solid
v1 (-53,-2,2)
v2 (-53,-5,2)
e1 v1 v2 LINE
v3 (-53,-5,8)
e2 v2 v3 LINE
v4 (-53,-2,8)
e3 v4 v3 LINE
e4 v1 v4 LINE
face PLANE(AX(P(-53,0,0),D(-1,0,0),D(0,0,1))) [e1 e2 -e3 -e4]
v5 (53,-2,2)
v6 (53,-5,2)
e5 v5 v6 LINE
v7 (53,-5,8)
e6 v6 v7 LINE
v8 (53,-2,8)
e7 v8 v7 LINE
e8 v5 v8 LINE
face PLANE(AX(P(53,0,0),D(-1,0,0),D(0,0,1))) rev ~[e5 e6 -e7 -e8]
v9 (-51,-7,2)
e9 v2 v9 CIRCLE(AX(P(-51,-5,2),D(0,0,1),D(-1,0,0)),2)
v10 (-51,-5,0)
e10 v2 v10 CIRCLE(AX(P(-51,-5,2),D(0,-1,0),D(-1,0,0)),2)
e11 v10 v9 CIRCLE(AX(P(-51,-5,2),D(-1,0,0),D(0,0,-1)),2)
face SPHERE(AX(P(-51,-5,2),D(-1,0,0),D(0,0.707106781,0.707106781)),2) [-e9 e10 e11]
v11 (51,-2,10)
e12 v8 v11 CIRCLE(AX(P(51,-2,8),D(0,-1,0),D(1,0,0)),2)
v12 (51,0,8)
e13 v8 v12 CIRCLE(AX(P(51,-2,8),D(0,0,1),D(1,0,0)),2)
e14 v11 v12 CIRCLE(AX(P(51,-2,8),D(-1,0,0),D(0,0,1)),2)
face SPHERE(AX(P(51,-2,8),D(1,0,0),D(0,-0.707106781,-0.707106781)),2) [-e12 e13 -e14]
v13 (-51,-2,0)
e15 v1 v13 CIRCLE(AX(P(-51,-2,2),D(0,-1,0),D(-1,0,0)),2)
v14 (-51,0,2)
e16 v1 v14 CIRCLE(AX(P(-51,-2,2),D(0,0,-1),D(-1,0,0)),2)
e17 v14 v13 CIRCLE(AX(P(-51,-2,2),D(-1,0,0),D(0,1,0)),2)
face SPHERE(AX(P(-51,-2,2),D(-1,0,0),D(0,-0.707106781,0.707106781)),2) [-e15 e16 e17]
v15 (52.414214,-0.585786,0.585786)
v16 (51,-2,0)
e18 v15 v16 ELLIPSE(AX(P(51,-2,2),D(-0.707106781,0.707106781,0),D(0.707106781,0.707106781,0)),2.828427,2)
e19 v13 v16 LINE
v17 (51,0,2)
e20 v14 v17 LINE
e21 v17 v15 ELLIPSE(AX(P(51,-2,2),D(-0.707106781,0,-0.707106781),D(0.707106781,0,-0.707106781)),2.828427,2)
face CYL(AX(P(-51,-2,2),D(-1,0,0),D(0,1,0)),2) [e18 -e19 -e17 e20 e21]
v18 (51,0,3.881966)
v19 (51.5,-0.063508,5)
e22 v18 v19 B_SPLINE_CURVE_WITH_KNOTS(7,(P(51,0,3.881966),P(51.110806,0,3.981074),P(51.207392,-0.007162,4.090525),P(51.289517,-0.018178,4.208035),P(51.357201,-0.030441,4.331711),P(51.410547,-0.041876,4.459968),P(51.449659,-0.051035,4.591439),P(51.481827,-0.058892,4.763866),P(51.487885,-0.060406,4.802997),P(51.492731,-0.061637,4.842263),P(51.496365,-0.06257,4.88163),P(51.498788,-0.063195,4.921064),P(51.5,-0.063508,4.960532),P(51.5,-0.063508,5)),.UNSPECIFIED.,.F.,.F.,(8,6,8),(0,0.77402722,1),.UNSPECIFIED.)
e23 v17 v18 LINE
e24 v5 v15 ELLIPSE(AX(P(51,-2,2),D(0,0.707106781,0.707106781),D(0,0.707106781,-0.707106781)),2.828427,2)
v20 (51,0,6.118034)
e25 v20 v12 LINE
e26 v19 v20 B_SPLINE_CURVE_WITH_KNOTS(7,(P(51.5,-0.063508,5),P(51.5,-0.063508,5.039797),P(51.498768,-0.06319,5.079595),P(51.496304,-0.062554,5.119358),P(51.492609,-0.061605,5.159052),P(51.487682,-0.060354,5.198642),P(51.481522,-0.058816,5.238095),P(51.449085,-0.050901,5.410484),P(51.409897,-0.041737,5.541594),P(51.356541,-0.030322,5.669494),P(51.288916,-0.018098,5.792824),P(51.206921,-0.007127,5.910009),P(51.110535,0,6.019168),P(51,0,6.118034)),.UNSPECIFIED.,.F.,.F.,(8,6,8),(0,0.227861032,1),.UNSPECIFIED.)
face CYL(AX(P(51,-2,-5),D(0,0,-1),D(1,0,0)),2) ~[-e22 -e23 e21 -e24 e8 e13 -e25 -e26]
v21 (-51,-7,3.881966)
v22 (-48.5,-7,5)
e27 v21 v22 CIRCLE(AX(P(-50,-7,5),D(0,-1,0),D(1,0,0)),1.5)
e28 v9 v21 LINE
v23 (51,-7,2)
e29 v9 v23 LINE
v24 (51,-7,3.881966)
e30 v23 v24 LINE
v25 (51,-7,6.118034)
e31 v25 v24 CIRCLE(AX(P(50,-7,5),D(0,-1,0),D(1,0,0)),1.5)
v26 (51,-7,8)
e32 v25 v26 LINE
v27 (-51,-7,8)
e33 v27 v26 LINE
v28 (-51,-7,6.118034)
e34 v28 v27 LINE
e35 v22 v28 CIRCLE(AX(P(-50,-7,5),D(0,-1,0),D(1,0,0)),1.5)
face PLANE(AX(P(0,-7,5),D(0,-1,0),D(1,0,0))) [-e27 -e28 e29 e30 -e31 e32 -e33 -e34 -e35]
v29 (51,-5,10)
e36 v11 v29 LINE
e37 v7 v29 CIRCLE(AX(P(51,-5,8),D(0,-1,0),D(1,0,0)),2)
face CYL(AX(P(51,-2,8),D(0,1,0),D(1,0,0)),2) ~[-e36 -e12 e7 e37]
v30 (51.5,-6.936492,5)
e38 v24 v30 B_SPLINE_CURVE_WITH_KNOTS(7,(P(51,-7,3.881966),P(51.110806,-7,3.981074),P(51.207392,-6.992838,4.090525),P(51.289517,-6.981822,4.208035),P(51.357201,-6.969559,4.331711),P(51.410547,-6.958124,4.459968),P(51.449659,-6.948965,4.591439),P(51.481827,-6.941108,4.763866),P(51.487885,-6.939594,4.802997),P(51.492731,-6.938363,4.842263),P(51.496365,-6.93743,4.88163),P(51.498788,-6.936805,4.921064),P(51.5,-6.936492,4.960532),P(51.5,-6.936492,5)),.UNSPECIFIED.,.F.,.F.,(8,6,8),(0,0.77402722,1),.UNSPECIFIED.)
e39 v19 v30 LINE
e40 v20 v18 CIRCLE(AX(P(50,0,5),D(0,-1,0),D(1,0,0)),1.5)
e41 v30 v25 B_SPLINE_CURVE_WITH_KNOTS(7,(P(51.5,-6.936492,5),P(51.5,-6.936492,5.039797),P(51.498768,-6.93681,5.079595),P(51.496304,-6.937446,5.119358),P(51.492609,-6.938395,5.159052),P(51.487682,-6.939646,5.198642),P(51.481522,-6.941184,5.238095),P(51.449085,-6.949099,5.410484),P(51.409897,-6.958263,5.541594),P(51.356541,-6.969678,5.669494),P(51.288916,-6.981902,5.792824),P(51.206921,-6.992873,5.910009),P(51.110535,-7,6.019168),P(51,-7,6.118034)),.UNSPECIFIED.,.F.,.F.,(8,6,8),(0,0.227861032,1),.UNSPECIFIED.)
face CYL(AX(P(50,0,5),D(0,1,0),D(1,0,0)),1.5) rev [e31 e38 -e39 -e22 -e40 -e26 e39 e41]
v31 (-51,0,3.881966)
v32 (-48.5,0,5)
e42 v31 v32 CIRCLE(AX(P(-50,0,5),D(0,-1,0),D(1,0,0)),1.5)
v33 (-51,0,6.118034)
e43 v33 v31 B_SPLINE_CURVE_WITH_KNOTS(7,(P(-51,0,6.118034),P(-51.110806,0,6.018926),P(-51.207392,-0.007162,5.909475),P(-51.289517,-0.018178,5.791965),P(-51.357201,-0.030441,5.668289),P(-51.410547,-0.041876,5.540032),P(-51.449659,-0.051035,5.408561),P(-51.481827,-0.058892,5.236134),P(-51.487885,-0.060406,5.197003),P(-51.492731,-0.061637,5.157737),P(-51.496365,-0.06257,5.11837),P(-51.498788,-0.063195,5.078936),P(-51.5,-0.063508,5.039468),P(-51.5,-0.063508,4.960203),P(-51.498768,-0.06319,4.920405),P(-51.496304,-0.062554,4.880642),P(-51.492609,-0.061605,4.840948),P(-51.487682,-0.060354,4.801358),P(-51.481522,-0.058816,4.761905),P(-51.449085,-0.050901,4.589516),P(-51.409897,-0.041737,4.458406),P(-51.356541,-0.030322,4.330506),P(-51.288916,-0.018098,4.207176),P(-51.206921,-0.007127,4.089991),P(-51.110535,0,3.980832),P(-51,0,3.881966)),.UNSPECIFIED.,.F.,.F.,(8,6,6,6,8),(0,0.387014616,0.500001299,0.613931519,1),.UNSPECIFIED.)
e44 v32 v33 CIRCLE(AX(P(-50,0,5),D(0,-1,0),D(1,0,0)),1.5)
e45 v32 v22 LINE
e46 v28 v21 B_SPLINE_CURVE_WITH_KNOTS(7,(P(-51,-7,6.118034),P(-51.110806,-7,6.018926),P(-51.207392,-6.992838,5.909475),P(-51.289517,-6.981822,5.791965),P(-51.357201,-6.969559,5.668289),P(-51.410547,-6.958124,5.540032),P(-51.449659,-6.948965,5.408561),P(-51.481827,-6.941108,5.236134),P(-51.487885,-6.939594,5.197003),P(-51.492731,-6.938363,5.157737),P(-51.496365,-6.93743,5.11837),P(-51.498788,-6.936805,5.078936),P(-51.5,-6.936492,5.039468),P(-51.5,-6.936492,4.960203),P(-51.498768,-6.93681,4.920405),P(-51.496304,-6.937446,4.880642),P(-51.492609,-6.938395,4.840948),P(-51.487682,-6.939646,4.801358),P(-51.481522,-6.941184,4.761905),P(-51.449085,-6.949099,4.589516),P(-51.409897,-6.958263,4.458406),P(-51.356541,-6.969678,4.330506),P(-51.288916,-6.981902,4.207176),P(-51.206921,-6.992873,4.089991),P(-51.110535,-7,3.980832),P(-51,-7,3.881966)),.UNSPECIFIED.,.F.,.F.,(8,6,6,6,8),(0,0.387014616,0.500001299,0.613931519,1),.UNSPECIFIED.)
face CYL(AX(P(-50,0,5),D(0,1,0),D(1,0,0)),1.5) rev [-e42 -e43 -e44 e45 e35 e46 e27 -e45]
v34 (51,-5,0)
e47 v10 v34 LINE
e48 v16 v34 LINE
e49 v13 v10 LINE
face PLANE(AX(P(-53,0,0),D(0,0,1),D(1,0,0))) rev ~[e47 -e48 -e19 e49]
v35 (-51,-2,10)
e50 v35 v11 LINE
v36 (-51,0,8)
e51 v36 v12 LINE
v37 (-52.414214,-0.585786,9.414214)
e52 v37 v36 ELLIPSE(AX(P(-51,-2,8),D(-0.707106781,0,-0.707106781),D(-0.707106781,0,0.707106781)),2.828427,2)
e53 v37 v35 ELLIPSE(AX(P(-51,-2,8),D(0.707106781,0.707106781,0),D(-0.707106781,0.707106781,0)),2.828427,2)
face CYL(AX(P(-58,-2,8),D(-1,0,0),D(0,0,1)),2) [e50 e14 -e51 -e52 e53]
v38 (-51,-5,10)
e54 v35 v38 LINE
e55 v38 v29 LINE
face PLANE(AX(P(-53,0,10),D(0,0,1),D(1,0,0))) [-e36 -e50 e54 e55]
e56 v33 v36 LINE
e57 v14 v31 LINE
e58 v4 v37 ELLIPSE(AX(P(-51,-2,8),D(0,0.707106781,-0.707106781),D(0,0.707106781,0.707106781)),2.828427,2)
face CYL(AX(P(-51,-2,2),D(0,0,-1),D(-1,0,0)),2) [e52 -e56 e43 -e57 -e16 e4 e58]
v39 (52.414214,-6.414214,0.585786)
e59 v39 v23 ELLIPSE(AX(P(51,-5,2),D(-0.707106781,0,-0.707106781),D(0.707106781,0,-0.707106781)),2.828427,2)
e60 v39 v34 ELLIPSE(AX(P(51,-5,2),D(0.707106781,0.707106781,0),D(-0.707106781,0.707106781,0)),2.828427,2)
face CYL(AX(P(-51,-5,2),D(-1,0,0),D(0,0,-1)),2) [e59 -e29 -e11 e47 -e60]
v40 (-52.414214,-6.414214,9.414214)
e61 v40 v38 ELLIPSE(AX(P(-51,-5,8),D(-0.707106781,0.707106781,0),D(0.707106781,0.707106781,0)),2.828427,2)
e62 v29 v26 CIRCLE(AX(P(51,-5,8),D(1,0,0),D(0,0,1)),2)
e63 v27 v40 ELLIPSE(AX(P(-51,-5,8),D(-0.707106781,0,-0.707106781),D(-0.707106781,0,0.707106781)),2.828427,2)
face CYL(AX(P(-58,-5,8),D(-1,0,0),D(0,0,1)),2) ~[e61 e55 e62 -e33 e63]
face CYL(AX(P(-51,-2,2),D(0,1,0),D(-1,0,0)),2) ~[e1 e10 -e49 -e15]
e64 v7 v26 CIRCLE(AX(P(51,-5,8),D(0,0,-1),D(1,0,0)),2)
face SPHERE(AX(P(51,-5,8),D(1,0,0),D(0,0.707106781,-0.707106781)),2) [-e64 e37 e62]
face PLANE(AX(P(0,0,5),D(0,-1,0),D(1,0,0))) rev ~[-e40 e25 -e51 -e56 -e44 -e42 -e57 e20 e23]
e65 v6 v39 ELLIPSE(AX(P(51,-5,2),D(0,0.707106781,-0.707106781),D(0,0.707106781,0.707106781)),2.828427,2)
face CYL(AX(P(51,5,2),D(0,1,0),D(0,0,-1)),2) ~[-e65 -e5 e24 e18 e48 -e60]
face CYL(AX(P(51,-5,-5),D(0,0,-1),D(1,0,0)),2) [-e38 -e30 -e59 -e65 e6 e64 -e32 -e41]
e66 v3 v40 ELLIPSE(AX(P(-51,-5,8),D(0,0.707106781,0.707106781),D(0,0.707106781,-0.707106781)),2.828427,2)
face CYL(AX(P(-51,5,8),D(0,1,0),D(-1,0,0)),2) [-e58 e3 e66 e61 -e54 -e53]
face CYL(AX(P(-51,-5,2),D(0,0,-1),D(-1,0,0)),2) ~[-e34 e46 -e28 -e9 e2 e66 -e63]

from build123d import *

# Parameters (mm, degrees)
F0_W         = 106
F0_H         = 10
F0_R         = 1.5
F1_DEPTH     = 7
F2_T1_DEPTH  = 17
F2_T3_DEPTH  = 3
F2_T5_DEPTH  = 13
F2_T7_DEPTH  = 109
F2_S11_W     = 2
F2_S11_H     = 2
F2_T12_DEPTH = 2
F2_S17_W     = 2
F2_S17_H     = 2
F2_T18_DEPTH = 2
F3_T1_DEPTH  = 11
F3_T3_DEPTH  = 3
F3_T5_DEPTH  = 107
F3_S9_W      = 2.04
F3_S9_H      = 2.04
F3_T10_DEPTH = 2.04
F3_S15_W     = 2.04
F3_S15_H     = 2.04
F3_T16_DEPTH = 2.04


# Not quite as in the source:
# - a fillet or chamfer that OpenCascade refuses, or shapes differently, is made with other operations: its cross-section is extruded or revolved along the edge and cut away or added


with BuildPart() as f1:
    # F0 (on Front) → F1 (new body)
    with BuildSketch(Plane.XZ):
        with Locations((0, 5)):
            Rectangle(F0_W, F0_H)
        with Locations((-50, 5)):
            Circle(F0_R, mode=Mode.SUBTRACT)
        with Locations((50, 5)):
            Circle(F0_R, mode=Mode.SUBTRACT)
    extrude(amount=F1_DEPTH)

    # F2: fillet of radius 2 on 7 edges, made by hand

    # F2_s2 → F2_t1 (cut)
    with BuildSketch(Plane.XZ.offset(-5)):
        with BuildLine():
            ThreePointArc((51, 0), (52.4142135624, 0.5857864376), (53, 2))
            Line((53, 2), (53, 0))
            Line((53, 0), (51, 0))
        make_face()
        with BuildLine():
            ThreePointArc((-53, 8), (-52.4142135624, 9.4142135624), (-51, 10))
            Line((-51, 10), (-53, 10))
            Line((-53, 10), (-53, 8))
        make_face()
    extrude(amount=F2_T1_DEPTH, mode=Mode.SUBTRACT)

    # F2_s4 → F2_t3 (cut)
    with BuildSketch(Plane.XZ.offset(2)):
        with BuildLine():
            ThreePointArc((53, 8), (52.4142135624, 9.4142135624), (51, 10))
            Line((51, 10), (53, 10))
            Line((53, 10), (53, 8))
        make_face()
    extrude(amount=F2_T3_DEPTH, mode=Mode.SUBTRACT)

    # F2_s6 → F2_t5 (cut)
    with BuildSketch(Plane.XY.offset(-5)):
        with BuildLine():
            ThreePointArc((53, -2), (52.4142135624, -0.5857864376), (51, 0))
            Line((51, 0), (53, 0))
            Line((53, 0), (53, -2))
        make_face()
        with BuildLine():
            ThreePointArc((53, -5), (52.4142135624, -6.4142135624), (51, -7))
            Line((51, -7), (53, -7))
            Line((53, -7), (53, -5))
        make_face()
    extrude(amount=F2_T5_DEPTH, mode=Mode.SUBTRACT)

    # F2_s8 → F2_t7 (cut)
    with BuildSketch(Plane.YZ.offset(-58)):
        with BuildLine():
            ThreePointArc((-2, 10), (-0.5857864376, 9.4142135624), (0, 8))
            Line((0, 8), (0, 10))
            Line((0, 10), (-2, 10))
        make_face()
        with BuildLine():
            ThreePointArc((-5, 10), (-6.4142135624, 9.4142135624), (-7, 8))
            Line((-7, 8), (-7, 10))
            Line((-7, 10), (-5, 10))
        make_face()
    extrude(amount=F2_T7_DEPTH, mode=Mode.SUBTRACT)


with BuildPart() as f2_tool10:
    # F2_s11 → F2_t12 (new body)
    with BuildSketch(Plane.YZ.offset(51)):
        with Locations((-1, 9)):
            Rectangle(F2_S11_W, F2_S11_H)
    extrude(amount=F2_T12_DEPTH)

    # F2_s13 → F2_t14 (revolve, cut)
    with BuildSketch(Plane(origin=(51, -2, 8), x_dir=(0, -0.7071067812, -0.7071067812), z_dir=(0, -0.7071067812, 0.7071067812))):
        with BuildLine():
            ThreePointArc((0, -2), (2, 0), (0, 2))
            Line((0, 2), (0, -2))
        make_face()
    revolve(axis=Axis((51, -2, 8), (1, 0, 0)), mode=Mode.SUBTRACT)


with BuildPart() as f1_1:
    add(f1.part)

    # F2_t9: cut F2_tool10
    add(f2_tool10.part, mode=Mode.SUBTRACT)


with BuildPart() as f2_tool16:
    # F2_s17 → F2_t18 (new body)
    with BuildSketch(Plane.YZ.offset(51)):
        with Locations((-6, 9)):
            Rectangle(F2_S17_W, F2_S17_H)
    extrude(amount=F2_T18_DEPTH)

    # F2_s19 → F2_t20 (revolve, cut)
    with BuildSketch(Plane(origin=(51, -5, 8), x_dir=(0, 0.7071067812, -0.7071067812), z_dir=(0, -0.7071067812, -0.7071067812))):
        with BuildLine():
            ThreePointArc((0, -2), (2, 0), (0, 2))
            Line((0, 2), (0, -2))
        make_face()
    revolve(axis=Axis((51, -5, 8), (1, 0, 0)), mode=Mode.SUBTRACT)


with BuildPart() as f1_2:
    add(f1_1.part)

    # F2_t15: cut F2_tool16
    add(f2_tool16.part, mode=Mode.SUBTRACT)

    # F3: fillet of radius 2 on 7 edges, made by hand

    # F3_s2 → F3_t1 (cut)
    with BuildSketch(Plane.XY.offset(2)):
        with BuildLine():
            ThreePointArc((-53, -2), (-52.4142135624, -0.5857864376), (-51, 0))
            Line((-51, 0), (-53, 0))
            Line((-53, 0), (-53, -2))
        make_face()
        with BuildLine():
            ThreePointArc((-53, -5), (-52.4142135624, -6.4142135624), (-51, -7))
            Line((-51, -7), (-53, -7))
            Line((-53, -7), (-53, -5))
        make_face()
    extrude(amount=F3_T1_DEPTH, mode=Mode.SUBTRACT)

    # F3_s4 → F3_t3 (cut)
    with BuildSketch(Plane.XZ.offset(2)):
        with BuildLine():
            ThreePointArc((-53, 2), (-52.4142135624, 0.5857864376), (-51, 0))
            Line((-51, 0), (-53, 0))
            Line((-53, 0), (-53, 2))
        make_face()
    extrude(amount=F3_T3_DEPTH, mode=Mode.SUBTRACT)

    # F3_s6 → F3_t5 (cut)
    with BuildSketch(Plane.YZ.offset(-51)):
        with BuildLine():
            ThreePointArc((0, 2), (-0.5857864376, 0.5857864376), (-2, 0))
            Line((-2, 0), (0, 0))
            Line((0, 0), (0, 2))
        make_face()
        with BuildLine():
            ThreePointArc((-5, 0), (-6.4142135624, 0.5857864376), (-7, 2))
            Line((-7, 2), (-7, 0))
            Line((-7, 0), (-5, 0))
        make_face()
    extrude(amount=F3_T5_DEPTH, mode=Mode.SUBTRACT)


with BuildPart() as f3_tool8:
    # F3_s9 → F3_t10 (new body)
    with BuildSketch(Plane.YZ.offset(-51)):
        with Locations((-0.98, 0.98)):
            Rectangle(F3_S9_W, F3_S9_H)
    extrude(amount=-F3_T10_DEPTH)

    # F3_s11 → F3_t12 (revolve, cut)
    with BuildSketch(Plane(origin=(-51, -2, 2), x_dir=(0, -0.7071067812, 0.7071067812), z_dir=(0, -0.7071067812, -0.7071067812))):
        with BuildLine():
            ThreePointArc((0, -2), (2, 0), (0, 2))
            Line((0, 2), (0, -2))
        make_face()
    revolve(axis=Axis((-51, -2, 2), (-1, 0, 0)), mode=Mode.SUBTRACT)


with BuildPart() as f1_3:
    add(f1_2.part)

    # F3_t7: cut F3_tool8
    add(f3_tool8.part, mode=Mode.SUBTRACT)


with BuildPart() as f3_tool14:
    # F3_s15 → F3_t16 (new body)
    with BuildSketch(Plane.YZ.offset(-51)):
        with Locations((-6.02, 0.98)):
            Rectangle(F3_S15_W, F3_S15_H)
    extrude(amount=-F3_T16_DEPTH)

    # F3_s17 → F3_t18 (revolve, cut)
    with BuildSketch(Plane(origin=(-51, -5, 2), x_dir=(0, 0.7071067812, 0.7071067812), z_dir=(0, -0.7071067812, 0.7071067812))):
        with BuildLine():
            ThreePointArc((0, -2), (2, 0), (0, 2))
            Line((0, 2), (0, -2))
        make_face()
    revolve(axis=Axis((-51, -5, 2), (-1, 0, 0)), mode=Mode.SUBTRACT)


with BuildPart() as f1_4:
    add(f1_3.part)

    # F3_t13: cut F3_tool14
    add(f3_tool14.part, mode=Mode.SUBTRACT)


solid = f1_4.part
